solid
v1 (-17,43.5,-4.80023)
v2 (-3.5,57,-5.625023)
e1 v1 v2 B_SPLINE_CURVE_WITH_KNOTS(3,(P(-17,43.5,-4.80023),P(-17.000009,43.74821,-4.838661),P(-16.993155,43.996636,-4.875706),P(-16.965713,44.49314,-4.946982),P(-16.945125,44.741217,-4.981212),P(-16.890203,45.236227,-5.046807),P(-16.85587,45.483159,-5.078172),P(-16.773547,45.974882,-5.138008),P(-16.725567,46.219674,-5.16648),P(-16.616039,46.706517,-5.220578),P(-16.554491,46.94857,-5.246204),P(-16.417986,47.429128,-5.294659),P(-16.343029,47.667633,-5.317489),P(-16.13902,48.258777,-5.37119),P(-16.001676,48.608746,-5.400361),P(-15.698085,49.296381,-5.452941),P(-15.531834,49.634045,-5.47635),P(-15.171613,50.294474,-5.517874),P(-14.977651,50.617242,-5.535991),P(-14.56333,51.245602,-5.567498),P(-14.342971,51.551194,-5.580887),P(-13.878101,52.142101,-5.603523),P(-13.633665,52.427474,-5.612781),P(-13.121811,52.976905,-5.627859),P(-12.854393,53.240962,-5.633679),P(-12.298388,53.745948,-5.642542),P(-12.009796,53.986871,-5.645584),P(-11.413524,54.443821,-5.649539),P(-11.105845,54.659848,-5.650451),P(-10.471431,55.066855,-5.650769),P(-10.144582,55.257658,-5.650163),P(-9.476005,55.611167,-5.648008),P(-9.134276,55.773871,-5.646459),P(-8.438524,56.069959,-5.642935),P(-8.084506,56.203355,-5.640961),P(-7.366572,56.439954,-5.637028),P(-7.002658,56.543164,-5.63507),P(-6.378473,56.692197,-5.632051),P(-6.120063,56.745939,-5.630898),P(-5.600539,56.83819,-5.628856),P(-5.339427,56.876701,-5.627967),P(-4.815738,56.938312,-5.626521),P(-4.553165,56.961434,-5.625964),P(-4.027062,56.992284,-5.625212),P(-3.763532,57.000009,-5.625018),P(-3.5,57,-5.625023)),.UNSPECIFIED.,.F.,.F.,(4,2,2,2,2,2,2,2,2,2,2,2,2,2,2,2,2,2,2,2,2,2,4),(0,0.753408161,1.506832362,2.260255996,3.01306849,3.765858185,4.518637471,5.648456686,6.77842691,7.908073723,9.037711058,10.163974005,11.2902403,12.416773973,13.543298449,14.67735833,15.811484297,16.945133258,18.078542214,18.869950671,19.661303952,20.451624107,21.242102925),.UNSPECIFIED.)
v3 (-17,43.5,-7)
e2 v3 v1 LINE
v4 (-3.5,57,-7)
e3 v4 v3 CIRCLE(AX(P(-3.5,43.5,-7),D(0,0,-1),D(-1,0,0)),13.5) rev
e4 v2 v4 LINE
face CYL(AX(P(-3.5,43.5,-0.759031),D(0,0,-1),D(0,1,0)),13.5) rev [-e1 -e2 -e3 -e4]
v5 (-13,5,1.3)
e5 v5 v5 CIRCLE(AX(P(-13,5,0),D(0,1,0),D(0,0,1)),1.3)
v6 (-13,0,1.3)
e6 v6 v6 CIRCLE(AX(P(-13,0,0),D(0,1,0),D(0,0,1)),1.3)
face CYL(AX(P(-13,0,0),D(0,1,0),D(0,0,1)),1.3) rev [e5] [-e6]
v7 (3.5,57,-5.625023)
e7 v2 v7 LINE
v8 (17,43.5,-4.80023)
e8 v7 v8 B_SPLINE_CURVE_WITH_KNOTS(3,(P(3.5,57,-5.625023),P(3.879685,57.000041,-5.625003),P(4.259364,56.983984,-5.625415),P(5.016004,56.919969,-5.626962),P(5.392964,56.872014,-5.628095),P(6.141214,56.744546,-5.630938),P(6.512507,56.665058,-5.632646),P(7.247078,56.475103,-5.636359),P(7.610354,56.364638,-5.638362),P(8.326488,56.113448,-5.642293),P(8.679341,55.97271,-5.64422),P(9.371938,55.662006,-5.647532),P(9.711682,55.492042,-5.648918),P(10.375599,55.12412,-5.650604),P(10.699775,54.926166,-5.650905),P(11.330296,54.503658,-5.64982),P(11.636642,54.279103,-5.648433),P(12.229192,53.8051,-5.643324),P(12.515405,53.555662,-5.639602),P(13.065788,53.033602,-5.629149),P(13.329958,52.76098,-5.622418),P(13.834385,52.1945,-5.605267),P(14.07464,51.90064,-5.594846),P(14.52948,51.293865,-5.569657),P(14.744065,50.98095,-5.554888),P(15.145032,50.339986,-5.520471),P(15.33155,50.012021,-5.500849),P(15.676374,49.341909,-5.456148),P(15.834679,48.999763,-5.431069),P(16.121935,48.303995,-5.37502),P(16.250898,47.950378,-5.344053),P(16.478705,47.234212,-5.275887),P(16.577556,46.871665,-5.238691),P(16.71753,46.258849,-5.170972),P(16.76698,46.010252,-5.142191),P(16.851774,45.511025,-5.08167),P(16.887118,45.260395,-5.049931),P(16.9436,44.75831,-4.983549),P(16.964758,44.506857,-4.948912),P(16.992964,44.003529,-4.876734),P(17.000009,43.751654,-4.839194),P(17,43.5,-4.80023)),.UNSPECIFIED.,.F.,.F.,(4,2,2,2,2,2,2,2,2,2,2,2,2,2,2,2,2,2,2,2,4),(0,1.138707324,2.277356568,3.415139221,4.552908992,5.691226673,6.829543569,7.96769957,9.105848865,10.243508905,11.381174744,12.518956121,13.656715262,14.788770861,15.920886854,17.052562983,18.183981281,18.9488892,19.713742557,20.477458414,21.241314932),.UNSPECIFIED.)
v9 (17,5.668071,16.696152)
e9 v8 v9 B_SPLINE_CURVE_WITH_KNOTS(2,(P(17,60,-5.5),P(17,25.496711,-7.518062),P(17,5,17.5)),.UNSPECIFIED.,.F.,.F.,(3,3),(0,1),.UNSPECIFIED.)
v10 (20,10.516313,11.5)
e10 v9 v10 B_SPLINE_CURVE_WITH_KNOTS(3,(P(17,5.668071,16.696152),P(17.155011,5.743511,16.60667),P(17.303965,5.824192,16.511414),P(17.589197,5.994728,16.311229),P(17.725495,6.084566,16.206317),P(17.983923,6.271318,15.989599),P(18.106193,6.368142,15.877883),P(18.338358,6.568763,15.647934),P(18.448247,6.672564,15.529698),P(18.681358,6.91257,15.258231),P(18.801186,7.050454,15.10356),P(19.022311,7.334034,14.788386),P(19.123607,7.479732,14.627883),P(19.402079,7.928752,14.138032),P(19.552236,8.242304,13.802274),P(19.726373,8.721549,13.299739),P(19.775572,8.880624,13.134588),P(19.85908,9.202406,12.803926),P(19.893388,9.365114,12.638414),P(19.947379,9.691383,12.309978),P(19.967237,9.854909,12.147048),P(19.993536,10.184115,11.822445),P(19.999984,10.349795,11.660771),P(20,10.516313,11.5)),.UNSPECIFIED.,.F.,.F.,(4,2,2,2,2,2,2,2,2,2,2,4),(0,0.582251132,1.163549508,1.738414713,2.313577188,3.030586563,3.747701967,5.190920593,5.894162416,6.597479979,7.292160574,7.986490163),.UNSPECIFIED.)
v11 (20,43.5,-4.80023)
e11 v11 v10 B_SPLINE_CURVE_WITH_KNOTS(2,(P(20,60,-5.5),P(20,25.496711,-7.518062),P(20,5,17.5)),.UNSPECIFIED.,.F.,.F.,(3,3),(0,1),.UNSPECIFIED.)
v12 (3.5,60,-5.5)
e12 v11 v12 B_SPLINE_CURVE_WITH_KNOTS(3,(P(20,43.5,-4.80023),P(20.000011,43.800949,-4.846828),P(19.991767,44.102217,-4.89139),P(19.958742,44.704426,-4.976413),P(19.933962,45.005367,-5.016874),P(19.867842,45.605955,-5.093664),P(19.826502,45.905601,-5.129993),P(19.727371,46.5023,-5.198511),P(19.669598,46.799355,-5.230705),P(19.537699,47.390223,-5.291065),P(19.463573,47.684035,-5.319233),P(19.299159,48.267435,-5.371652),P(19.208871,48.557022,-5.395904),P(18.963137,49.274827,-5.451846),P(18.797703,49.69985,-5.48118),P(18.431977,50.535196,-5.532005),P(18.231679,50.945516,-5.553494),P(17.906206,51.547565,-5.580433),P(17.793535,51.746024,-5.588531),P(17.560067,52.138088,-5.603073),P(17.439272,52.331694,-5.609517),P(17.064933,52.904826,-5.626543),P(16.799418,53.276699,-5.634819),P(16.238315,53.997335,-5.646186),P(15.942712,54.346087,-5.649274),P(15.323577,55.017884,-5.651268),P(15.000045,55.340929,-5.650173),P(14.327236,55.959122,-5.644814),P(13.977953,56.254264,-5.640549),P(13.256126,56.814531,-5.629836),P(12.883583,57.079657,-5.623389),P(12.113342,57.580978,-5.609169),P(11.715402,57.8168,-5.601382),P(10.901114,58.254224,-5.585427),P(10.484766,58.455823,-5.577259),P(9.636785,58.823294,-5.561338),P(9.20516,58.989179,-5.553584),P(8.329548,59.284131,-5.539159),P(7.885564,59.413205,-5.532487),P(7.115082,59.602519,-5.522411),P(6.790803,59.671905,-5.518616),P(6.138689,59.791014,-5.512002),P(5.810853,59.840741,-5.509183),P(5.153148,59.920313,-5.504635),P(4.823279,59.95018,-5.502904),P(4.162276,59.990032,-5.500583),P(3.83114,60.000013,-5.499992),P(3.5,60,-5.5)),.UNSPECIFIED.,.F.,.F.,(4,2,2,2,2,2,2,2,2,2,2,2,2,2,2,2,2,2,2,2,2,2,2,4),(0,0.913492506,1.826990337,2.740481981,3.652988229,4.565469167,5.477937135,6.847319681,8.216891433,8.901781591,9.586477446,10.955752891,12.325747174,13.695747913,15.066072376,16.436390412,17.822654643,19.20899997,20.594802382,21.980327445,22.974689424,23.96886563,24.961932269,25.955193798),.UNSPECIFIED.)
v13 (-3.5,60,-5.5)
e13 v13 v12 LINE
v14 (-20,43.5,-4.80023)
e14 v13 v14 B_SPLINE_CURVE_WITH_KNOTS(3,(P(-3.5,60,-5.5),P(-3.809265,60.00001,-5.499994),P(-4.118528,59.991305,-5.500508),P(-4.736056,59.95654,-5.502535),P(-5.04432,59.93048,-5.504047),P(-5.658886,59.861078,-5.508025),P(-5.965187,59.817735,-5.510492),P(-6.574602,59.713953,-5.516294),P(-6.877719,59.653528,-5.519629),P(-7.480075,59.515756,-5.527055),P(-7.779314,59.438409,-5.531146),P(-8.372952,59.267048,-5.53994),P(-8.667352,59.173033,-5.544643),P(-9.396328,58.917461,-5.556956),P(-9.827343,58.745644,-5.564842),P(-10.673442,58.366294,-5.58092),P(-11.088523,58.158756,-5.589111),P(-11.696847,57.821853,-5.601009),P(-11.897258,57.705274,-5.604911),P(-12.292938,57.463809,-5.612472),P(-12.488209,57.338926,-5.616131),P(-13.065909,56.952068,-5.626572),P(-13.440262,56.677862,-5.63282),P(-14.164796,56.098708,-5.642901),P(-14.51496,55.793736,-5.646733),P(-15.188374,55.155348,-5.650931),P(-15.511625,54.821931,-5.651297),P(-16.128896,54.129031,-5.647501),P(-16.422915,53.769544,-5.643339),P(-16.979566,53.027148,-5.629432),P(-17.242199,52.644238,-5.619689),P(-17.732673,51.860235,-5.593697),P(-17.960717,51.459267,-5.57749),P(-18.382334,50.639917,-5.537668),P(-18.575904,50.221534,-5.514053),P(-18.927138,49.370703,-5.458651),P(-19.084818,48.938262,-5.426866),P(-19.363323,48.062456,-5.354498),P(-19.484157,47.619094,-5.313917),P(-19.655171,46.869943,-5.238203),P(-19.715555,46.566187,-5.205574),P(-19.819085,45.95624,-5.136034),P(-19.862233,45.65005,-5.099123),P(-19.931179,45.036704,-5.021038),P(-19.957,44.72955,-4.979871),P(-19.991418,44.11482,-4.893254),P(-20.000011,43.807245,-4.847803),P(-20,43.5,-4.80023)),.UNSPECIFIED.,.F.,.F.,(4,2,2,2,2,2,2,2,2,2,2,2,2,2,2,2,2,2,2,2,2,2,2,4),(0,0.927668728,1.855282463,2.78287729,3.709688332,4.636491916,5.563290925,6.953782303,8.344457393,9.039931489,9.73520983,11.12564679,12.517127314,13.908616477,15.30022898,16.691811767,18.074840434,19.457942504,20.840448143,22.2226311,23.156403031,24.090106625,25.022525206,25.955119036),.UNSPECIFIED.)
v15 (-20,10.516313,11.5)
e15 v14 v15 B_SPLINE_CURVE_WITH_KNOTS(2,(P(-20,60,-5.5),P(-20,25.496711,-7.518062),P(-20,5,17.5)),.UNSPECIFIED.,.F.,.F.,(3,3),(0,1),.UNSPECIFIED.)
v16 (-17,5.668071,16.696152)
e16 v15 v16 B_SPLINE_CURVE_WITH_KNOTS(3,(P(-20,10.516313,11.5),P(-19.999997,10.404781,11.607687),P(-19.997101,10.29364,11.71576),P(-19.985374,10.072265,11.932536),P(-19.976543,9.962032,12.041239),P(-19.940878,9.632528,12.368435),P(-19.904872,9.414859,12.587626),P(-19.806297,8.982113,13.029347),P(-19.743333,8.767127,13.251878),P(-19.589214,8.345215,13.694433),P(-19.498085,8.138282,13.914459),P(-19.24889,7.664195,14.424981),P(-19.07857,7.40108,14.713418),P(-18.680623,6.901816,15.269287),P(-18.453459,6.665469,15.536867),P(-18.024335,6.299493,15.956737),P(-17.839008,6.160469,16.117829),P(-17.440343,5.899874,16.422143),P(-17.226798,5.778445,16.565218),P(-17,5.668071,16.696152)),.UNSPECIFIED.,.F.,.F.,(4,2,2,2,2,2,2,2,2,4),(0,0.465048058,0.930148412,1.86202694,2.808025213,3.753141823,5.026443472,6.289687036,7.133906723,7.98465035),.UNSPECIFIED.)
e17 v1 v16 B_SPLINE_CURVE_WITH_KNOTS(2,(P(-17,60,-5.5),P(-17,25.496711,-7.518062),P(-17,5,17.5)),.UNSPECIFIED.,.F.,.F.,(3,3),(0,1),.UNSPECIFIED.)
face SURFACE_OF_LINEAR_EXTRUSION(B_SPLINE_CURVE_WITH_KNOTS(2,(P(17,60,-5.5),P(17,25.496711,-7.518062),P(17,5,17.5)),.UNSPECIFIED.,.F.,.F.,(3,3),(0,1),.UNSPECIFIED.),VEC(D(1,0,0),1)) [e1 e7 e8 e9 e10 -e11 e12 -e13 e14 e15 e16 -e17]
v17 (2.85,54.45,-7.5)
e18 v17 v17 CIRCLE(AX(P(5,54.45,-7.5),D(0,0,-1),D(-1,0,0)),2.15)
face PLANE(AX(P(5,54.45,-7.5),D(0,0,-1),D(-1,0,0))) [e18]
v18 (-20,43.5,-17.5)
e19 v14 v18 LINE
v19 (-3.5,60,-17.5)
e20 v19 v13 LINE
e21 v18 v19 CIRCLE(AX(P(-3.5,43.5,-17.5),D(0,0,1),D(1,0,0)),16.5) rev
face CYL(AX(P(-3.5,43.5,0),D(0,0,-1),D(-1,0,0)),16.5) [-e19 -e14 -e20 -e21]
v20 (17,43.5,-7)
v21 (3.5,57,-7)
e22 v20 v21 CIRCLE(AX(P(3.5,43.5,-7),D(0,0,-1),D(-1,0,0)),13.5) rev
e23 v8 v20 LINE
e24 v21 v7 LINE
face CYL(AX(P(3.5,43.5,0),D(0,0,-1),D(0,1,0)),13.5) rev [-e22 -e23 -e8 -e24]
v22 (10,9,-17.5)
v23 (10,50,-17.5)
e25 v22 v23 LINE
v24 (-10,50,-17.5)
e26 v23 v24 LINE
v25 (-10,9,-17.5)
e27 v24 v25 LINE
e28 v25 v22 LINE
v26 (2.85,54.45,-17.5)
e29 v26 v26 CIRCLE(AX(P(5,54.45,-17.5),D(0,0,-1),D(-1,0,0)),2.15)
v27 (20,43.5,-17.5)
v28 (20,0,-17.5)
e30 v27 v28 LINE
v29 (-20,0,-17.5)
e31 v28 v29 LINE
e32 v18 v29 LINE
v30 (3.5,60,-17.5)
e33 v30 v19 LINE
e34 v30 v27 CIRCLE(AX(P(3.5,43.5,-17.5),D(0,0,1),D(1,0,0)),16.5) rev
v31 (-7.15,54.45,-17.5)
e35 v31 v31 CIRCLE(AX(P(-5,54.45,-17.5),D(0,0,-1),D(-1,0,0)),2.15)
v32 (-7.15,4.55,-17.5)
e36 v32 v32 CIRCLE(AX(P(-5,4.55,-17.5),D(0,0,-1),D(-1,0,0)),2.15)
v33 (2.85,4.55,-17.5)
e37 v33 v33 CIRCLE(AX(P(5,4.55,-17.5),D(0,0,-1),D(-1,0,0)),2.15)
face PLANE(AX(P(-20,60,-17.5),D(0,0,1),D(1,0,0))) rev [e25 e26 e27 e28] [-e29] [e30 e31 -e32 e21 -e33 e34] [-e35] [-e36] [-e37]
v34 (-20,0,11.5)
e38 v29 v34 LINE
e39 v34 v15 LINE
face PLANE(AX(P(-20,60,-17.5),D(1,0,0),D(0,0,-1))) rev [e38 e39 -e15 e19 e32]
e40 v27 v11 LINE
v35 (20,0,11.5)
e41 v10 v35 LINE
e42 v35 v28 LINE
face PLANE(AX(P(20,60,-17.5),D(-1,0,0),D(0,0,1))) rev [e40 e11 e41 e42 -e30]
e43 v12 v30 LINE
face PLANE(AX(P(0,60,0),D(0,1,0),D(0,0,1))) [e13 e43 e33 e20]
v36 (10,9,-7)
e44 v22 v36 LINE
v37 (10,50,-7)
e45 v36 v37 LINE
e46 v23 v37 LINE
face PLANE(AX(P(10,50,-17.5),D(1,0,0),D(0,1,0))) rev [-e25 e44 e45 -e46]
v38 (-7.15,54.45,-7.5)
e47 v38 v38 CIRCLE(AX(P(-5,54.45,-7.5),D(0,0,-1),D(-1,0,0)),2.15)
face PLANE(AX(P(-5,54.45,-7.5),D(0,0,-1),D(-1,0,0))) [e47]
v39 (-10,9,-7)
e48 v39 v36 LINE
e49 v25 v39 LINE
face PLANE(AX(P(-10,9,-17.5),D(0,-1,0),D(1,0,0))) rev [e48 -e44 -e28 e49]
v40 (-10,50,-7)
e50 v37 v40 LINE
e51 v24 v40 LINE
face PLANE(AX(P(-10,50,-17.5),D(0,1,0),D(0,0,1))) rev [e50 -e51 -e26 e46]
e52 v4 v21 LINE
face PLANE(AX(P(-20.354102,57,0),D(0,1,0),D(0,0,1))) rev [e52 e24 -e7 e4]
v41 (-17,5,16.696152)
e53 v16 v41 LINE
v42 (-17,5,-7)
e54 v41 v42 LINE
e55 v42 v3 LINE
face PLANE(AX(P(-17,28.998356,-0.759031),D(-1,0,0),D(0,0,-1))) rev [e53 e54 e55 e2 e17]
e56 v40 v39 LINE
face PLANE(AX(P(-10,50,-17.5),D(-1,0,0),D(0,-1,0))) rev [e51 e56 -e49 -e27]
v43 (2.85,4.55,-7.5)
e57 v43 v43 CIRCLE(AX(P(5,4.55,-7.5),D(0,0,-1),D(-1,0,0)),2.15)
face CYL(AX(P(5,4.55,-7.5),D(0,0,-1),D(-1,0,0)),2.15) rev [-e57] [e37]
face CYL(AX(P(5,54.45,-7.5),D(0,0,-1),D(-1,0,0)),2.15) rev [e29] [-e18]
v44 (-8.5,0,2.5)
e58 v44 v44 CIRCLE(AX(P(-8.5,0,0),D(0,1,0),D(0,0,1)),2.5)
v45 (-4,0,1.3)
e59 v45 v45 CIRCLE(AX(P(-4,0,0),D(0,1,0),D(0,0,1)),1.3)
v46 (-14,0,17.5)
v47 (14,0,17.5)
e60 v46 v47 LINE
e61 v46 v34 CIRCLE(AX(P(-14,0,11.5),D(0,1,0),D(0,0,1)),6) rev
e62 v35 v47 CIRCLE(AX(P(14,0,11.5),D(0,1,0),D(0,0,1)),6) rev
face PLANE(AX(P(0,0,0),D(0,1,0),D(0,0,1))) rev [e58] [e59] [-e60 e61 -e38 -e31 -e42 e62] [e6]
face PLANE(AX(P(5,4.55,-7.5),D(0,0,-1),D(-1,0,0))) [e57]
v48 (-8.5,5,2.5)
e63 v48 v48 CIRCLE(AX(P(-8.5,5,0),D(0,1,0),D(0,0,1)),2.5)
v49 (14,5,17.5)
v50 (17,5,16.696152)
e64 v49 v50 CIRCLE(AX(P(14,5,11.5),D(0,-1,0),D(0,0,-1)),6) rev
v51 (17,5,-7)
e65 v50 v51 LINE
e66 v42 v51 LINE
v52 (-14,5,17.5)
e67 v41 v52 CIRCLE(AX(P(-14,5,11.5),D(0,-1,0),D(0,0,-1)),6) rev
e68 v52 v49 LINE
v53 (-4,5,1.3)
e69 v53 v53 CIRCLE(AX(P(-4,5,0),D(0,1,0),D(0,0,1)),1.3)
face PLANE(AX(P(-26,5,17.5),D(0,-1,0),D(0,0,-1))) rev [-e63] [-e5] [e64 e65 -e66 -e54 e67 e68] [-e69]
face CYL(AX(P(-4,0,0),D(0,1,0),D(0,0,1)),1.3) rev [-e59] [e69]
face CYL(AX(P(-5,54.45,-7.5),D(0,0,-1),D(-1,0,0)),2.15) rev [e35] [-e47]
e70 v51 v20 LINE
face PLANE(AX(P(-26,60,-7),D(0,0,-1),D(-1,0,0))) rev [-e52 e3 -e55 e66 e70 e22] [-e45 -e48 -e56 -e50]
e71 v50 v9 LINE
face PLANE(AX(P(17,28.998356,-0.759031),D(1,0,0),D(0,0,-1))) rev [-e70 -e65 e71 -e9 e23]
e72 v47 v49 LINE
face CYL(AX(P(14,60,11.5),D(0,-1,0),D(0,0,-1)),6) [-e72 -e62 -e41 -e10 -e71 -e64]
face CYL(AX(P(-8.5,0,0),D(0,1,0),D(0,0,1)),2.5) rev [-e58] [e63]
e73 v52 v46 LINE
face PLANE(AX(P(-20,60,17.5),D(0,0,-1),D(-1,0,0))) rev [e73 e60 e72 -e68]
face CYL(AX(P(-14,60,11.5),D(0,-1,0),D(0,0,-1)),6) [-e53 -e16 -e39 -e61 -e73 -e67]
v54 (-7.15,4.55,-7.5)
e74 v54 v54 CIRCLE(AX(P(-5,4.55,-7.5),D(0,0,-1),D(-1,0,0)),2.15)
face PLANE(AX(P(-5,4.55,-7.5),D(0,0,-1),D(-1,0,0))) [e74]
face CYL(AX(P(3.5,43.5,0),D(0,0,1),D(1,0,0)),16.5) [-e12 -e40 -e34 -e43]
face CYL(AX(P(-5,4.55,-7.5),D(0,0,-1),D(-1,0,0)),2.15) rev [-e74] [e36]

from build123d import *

# Parameters (mm, degrees)
SKETCH1_W           = 40
SKETCH1_H           = 35
BOSS_EXTRUDE1_DEPTH = 60
SKETCH2_W           = 24.5
SKETCH2_H           = 55
CUT_EXTRUDE1_DEPTH  = 46
BOSS_EXTRUDE2_DEPTH = 3
BOSS_EXTRUDE3_DEPTH = 34
FILLET1_START       = -8
FILLET1_DEPTH       = 3.199770331
FILLET1_START_2     = -17
FILLET1_2_DEPTH     = 34
FILLET2_R           = 16.5
FILLET3_R           = 6
SKETCH5_W           = 20
SKETCH5_H           = 41
CUT_EXTRUDE2_DEPTH  = 68.825143224
SKETCH8_R           = 1.3
SKETCH8_R_2         = 2.5
CUT_EXTRUDE5_DEPTH  = 62.083959026
SKETCH9_R           = 2.15
CUT_EXTRUDE6_DEPTH  = 10


with BuildPart() as part:
    # Sketch1 → Boss-Extrude1 (new body)
    with BuildSketch(Plane(origin=(0, 0, 0), x_dir=(1, 0, 0), z_dir=(0, 1, 0))):
        Rectangle(SKETCH1_W, SKETCH1_H)
    extrude(amount=BOSS_EXTRUDE1_DEPTH)

    # Sketch2 → Cut-Extrude1 (cut)
    with BuildSketch(Plane(origin=(20, 0, 0), x_dir=(0, 0, -1), z_dir=(1, 0, 0))):
        with Locations((-5.25, 32.5)):
            Rectangle(SKETCH2_W, SKETCH2_H)
    extrude(amount=-CUT_EXTRUDE1_DEPTH, mode=Mode.SUBTRACT)

    # Sketch3 → Boss-Extrude2 (add)
    with BuildSketch(Plane(origin=(20, 0, 0), x_dir=(0, 0, -1), z_dir=(1, 0, 0))):
        with BuildLine():
            Line((7, 60), (5.5, 60))
            add(Edge.make_bspline(
                [(5.5, 60), (7.518062239, 25.49671142), (-17.5, 5)],
                knots=[0, 0, 0, 1, 1, 1], degree=2))
            Line((-17.5, 5), (7, 5))
            Line((7, 5), (7, 60))
        make_face()
    boss_extrude2 = extrude(amount=-BOSS_EXTRUDE2_DEPTH)

    # Mirror1: Boss-Extrude2 across plane
    add(boss_extrude2.mirror(Plane(origin=(0, 0, 0), x_dir=(0, 0, 1), z_dir=(1, 0, 0))))

    # Sketch4 → Boss-Extrude3 (add)
    with BuildSketch(Plane.ZY.offset(-17)):
        with BuildLine():
            Line((-7, 60), (-7, 57))
            Line((-7, 57), (-5.625022797, 57))
            add(Edge.make_bspline(
                [(-5.625022797, 57), (-5.588521617, 58.486524947), (-5.499999996, 60.000000071)],
                knots=[0.956135337, 0.956135337, 0.956135337, 1, 1, 1], degree=2))
            Line((-5.499999996, 60.000000071), (-7, 60))
        make_face()
    extrude(amount=BOSS_EXTRUDE3_DEPTH)

    # Fillet1: read off the stored shape, not the designer's step
    # Fillet1 outline → Fillet1 (add)
    with BuildSketch(Plane.XY.offset(FILLET1_START)):
        with BuildLine():
            Line((-17, 57), (-17, 43.5))
            ThreePointArc((-17, 43.5), (-13.045941546, 53.045941546), (-3.5, 57))
            Line((-3.5, 57), (-17, 57))
        make_face()
        with BuildLine():
            Line((17, 57), (3.5, 57))
            ThreePointArc((3.5, 57), (13.045941546, 53.045941546), (17, 43.5))
            Line((17, 43.5), (17, 57))
        make_face()
    extrude(amount=FILLET1_DEPTH)

    # Fillet1 2 outline → Fillet1 2 (cut)
    with BuildSketch(Plane.YZ.offset(FILLET1_START_2)):
        with BuildLine():
            add(Edge.make_bspline(
                [(57, -5.625022797), (49.946623945, -5.798216358), (43.499999985, -4.800229766)],
                knots=[0.043864662, 0.043864662, 0.043864662, 0.251997034, 0.251997034, 0.251997034], degree=2))
            Line((57, -5.625022797), (57, -4.800229669))
            Line((57, -4.800229669), (43.499999985, -4.800229766))
        make_face()
    extrude(amount=FILLET1_2_DEPTH, mode=Mode.SUBTRACT)

    # Fillet2
    # the kernel refuses this fillet: 16.5 mm, written as the material it takes off along each edge
    with BuildSketch(Plane(origin=(20, 60, -58.75), x_dir=(0, -1, 0), z_dir=(0, 0, 1)), Plane(origin=(-20, 60, 35.75), x_dir=(0, -1, 0), z_dir=(0, 0, -1))) as fillet2_piece_1:
        with BuildLine():
            CenterArc((FILLET2_R, -FILLET2_R), FILLET2_R, 90, 90)
            Line((0, -FILLET2_R), (0, 0))
            Line((0, 0), (FILLET2_R, 0))
        make_face()
    extrude(amount=94.5, mode=Mode.SUBTRACT)

    # Fillet3
    # the kernel refuses this fillet: 6 mm, written as the material it takes off along each edge
    with BuildSketch(Plane(origin=(-20, -15, 17.5), x_dir=(0, 0, -1), z_dir=(0, 1, 0))) as fillet3_piece_1:
        with BuildLine():
            CenterArc((FILLET3_R, -FILLET3_R), FILLET3_R, 90, 90)
            Line((0, -FILLET3_R), (0, 0))
            Line((0, 0), (FILLET3_R, 0))
        make_face()
    extrude(amount=35, mode=Mode.SUBTRACT)
    with BuildSketch(Plane(origin=(20, -15, 17.5), x_dir=(0, 0, -1), z_dir=(0, 1, 0))) as fillet3_piece_2:
        with BuildLine():
            CenterArc((FILLET3_R, FILLET3_R), FILLET3_R, 180, 90)
            Line((0, FILLET3_R), (0, 0))
            Line((0, 0), (FILLET3_R, 0))
        make_face()
    extrude(amount=35, mode=Mode.SUBTRACT)

    # Sketch5 → Cut-Extrude2 (cut, through all)
    with BuildSketch(Plane.XY.offset(-7)):
        with Locations((0, 29.5)):
            Rectangle(SKETCH5_W, SKETCH5_H)
    extrude(amount=-CUT_EXTRUDE2_DEPTH, mode=Mode.SUBTRACT)

    # Sketch8 → Cut-Extrude5 (cut, through all)
    with BuildSketch(Plane(origin=(0, 5, 0), x_dir=(1, 0, 0), z_dir=(0, 1, 0))):
        with Locations(Location((-4, 0, 0), (0, 0, 270))):
            Circle(SKETCH8_R)
        with Locations(Location((-8.5, 0, 0), (0, 0, 270))):
            Circle(SKETCH8_R_2)
        with Locations(Location((-13, 0, 0), (0, 0, 270))):
            Circle(SKETCH8_R)
    extrude(amount=-CUT_EXTRUDE5_DEPTH, mode=Mode.SUBTRACT)

    # Sketch9 → Cut-Extrude6 (cut)
    with BuildSketch(Plane(origin=(0, 0, -17.5), x_dir=(-1, 0, 0), z_dir=(0, 0, -1))):
        with Locations((-5, 54.45)):
            Circle(SKETCH9_R)
        with Locations((5, 54.45)):
            Circle(SKETCH9_R)
        with Locations((5, 4.55)):
            Circle(SKETCH9_R)
        with Locations((-5, 4.55)):
            Circle(SKETCH9_R)
    extrude(amount=-CUT_EXTRUDE6_DEPTH, mode=Mode.SUBTRACT)


solid = part.part
